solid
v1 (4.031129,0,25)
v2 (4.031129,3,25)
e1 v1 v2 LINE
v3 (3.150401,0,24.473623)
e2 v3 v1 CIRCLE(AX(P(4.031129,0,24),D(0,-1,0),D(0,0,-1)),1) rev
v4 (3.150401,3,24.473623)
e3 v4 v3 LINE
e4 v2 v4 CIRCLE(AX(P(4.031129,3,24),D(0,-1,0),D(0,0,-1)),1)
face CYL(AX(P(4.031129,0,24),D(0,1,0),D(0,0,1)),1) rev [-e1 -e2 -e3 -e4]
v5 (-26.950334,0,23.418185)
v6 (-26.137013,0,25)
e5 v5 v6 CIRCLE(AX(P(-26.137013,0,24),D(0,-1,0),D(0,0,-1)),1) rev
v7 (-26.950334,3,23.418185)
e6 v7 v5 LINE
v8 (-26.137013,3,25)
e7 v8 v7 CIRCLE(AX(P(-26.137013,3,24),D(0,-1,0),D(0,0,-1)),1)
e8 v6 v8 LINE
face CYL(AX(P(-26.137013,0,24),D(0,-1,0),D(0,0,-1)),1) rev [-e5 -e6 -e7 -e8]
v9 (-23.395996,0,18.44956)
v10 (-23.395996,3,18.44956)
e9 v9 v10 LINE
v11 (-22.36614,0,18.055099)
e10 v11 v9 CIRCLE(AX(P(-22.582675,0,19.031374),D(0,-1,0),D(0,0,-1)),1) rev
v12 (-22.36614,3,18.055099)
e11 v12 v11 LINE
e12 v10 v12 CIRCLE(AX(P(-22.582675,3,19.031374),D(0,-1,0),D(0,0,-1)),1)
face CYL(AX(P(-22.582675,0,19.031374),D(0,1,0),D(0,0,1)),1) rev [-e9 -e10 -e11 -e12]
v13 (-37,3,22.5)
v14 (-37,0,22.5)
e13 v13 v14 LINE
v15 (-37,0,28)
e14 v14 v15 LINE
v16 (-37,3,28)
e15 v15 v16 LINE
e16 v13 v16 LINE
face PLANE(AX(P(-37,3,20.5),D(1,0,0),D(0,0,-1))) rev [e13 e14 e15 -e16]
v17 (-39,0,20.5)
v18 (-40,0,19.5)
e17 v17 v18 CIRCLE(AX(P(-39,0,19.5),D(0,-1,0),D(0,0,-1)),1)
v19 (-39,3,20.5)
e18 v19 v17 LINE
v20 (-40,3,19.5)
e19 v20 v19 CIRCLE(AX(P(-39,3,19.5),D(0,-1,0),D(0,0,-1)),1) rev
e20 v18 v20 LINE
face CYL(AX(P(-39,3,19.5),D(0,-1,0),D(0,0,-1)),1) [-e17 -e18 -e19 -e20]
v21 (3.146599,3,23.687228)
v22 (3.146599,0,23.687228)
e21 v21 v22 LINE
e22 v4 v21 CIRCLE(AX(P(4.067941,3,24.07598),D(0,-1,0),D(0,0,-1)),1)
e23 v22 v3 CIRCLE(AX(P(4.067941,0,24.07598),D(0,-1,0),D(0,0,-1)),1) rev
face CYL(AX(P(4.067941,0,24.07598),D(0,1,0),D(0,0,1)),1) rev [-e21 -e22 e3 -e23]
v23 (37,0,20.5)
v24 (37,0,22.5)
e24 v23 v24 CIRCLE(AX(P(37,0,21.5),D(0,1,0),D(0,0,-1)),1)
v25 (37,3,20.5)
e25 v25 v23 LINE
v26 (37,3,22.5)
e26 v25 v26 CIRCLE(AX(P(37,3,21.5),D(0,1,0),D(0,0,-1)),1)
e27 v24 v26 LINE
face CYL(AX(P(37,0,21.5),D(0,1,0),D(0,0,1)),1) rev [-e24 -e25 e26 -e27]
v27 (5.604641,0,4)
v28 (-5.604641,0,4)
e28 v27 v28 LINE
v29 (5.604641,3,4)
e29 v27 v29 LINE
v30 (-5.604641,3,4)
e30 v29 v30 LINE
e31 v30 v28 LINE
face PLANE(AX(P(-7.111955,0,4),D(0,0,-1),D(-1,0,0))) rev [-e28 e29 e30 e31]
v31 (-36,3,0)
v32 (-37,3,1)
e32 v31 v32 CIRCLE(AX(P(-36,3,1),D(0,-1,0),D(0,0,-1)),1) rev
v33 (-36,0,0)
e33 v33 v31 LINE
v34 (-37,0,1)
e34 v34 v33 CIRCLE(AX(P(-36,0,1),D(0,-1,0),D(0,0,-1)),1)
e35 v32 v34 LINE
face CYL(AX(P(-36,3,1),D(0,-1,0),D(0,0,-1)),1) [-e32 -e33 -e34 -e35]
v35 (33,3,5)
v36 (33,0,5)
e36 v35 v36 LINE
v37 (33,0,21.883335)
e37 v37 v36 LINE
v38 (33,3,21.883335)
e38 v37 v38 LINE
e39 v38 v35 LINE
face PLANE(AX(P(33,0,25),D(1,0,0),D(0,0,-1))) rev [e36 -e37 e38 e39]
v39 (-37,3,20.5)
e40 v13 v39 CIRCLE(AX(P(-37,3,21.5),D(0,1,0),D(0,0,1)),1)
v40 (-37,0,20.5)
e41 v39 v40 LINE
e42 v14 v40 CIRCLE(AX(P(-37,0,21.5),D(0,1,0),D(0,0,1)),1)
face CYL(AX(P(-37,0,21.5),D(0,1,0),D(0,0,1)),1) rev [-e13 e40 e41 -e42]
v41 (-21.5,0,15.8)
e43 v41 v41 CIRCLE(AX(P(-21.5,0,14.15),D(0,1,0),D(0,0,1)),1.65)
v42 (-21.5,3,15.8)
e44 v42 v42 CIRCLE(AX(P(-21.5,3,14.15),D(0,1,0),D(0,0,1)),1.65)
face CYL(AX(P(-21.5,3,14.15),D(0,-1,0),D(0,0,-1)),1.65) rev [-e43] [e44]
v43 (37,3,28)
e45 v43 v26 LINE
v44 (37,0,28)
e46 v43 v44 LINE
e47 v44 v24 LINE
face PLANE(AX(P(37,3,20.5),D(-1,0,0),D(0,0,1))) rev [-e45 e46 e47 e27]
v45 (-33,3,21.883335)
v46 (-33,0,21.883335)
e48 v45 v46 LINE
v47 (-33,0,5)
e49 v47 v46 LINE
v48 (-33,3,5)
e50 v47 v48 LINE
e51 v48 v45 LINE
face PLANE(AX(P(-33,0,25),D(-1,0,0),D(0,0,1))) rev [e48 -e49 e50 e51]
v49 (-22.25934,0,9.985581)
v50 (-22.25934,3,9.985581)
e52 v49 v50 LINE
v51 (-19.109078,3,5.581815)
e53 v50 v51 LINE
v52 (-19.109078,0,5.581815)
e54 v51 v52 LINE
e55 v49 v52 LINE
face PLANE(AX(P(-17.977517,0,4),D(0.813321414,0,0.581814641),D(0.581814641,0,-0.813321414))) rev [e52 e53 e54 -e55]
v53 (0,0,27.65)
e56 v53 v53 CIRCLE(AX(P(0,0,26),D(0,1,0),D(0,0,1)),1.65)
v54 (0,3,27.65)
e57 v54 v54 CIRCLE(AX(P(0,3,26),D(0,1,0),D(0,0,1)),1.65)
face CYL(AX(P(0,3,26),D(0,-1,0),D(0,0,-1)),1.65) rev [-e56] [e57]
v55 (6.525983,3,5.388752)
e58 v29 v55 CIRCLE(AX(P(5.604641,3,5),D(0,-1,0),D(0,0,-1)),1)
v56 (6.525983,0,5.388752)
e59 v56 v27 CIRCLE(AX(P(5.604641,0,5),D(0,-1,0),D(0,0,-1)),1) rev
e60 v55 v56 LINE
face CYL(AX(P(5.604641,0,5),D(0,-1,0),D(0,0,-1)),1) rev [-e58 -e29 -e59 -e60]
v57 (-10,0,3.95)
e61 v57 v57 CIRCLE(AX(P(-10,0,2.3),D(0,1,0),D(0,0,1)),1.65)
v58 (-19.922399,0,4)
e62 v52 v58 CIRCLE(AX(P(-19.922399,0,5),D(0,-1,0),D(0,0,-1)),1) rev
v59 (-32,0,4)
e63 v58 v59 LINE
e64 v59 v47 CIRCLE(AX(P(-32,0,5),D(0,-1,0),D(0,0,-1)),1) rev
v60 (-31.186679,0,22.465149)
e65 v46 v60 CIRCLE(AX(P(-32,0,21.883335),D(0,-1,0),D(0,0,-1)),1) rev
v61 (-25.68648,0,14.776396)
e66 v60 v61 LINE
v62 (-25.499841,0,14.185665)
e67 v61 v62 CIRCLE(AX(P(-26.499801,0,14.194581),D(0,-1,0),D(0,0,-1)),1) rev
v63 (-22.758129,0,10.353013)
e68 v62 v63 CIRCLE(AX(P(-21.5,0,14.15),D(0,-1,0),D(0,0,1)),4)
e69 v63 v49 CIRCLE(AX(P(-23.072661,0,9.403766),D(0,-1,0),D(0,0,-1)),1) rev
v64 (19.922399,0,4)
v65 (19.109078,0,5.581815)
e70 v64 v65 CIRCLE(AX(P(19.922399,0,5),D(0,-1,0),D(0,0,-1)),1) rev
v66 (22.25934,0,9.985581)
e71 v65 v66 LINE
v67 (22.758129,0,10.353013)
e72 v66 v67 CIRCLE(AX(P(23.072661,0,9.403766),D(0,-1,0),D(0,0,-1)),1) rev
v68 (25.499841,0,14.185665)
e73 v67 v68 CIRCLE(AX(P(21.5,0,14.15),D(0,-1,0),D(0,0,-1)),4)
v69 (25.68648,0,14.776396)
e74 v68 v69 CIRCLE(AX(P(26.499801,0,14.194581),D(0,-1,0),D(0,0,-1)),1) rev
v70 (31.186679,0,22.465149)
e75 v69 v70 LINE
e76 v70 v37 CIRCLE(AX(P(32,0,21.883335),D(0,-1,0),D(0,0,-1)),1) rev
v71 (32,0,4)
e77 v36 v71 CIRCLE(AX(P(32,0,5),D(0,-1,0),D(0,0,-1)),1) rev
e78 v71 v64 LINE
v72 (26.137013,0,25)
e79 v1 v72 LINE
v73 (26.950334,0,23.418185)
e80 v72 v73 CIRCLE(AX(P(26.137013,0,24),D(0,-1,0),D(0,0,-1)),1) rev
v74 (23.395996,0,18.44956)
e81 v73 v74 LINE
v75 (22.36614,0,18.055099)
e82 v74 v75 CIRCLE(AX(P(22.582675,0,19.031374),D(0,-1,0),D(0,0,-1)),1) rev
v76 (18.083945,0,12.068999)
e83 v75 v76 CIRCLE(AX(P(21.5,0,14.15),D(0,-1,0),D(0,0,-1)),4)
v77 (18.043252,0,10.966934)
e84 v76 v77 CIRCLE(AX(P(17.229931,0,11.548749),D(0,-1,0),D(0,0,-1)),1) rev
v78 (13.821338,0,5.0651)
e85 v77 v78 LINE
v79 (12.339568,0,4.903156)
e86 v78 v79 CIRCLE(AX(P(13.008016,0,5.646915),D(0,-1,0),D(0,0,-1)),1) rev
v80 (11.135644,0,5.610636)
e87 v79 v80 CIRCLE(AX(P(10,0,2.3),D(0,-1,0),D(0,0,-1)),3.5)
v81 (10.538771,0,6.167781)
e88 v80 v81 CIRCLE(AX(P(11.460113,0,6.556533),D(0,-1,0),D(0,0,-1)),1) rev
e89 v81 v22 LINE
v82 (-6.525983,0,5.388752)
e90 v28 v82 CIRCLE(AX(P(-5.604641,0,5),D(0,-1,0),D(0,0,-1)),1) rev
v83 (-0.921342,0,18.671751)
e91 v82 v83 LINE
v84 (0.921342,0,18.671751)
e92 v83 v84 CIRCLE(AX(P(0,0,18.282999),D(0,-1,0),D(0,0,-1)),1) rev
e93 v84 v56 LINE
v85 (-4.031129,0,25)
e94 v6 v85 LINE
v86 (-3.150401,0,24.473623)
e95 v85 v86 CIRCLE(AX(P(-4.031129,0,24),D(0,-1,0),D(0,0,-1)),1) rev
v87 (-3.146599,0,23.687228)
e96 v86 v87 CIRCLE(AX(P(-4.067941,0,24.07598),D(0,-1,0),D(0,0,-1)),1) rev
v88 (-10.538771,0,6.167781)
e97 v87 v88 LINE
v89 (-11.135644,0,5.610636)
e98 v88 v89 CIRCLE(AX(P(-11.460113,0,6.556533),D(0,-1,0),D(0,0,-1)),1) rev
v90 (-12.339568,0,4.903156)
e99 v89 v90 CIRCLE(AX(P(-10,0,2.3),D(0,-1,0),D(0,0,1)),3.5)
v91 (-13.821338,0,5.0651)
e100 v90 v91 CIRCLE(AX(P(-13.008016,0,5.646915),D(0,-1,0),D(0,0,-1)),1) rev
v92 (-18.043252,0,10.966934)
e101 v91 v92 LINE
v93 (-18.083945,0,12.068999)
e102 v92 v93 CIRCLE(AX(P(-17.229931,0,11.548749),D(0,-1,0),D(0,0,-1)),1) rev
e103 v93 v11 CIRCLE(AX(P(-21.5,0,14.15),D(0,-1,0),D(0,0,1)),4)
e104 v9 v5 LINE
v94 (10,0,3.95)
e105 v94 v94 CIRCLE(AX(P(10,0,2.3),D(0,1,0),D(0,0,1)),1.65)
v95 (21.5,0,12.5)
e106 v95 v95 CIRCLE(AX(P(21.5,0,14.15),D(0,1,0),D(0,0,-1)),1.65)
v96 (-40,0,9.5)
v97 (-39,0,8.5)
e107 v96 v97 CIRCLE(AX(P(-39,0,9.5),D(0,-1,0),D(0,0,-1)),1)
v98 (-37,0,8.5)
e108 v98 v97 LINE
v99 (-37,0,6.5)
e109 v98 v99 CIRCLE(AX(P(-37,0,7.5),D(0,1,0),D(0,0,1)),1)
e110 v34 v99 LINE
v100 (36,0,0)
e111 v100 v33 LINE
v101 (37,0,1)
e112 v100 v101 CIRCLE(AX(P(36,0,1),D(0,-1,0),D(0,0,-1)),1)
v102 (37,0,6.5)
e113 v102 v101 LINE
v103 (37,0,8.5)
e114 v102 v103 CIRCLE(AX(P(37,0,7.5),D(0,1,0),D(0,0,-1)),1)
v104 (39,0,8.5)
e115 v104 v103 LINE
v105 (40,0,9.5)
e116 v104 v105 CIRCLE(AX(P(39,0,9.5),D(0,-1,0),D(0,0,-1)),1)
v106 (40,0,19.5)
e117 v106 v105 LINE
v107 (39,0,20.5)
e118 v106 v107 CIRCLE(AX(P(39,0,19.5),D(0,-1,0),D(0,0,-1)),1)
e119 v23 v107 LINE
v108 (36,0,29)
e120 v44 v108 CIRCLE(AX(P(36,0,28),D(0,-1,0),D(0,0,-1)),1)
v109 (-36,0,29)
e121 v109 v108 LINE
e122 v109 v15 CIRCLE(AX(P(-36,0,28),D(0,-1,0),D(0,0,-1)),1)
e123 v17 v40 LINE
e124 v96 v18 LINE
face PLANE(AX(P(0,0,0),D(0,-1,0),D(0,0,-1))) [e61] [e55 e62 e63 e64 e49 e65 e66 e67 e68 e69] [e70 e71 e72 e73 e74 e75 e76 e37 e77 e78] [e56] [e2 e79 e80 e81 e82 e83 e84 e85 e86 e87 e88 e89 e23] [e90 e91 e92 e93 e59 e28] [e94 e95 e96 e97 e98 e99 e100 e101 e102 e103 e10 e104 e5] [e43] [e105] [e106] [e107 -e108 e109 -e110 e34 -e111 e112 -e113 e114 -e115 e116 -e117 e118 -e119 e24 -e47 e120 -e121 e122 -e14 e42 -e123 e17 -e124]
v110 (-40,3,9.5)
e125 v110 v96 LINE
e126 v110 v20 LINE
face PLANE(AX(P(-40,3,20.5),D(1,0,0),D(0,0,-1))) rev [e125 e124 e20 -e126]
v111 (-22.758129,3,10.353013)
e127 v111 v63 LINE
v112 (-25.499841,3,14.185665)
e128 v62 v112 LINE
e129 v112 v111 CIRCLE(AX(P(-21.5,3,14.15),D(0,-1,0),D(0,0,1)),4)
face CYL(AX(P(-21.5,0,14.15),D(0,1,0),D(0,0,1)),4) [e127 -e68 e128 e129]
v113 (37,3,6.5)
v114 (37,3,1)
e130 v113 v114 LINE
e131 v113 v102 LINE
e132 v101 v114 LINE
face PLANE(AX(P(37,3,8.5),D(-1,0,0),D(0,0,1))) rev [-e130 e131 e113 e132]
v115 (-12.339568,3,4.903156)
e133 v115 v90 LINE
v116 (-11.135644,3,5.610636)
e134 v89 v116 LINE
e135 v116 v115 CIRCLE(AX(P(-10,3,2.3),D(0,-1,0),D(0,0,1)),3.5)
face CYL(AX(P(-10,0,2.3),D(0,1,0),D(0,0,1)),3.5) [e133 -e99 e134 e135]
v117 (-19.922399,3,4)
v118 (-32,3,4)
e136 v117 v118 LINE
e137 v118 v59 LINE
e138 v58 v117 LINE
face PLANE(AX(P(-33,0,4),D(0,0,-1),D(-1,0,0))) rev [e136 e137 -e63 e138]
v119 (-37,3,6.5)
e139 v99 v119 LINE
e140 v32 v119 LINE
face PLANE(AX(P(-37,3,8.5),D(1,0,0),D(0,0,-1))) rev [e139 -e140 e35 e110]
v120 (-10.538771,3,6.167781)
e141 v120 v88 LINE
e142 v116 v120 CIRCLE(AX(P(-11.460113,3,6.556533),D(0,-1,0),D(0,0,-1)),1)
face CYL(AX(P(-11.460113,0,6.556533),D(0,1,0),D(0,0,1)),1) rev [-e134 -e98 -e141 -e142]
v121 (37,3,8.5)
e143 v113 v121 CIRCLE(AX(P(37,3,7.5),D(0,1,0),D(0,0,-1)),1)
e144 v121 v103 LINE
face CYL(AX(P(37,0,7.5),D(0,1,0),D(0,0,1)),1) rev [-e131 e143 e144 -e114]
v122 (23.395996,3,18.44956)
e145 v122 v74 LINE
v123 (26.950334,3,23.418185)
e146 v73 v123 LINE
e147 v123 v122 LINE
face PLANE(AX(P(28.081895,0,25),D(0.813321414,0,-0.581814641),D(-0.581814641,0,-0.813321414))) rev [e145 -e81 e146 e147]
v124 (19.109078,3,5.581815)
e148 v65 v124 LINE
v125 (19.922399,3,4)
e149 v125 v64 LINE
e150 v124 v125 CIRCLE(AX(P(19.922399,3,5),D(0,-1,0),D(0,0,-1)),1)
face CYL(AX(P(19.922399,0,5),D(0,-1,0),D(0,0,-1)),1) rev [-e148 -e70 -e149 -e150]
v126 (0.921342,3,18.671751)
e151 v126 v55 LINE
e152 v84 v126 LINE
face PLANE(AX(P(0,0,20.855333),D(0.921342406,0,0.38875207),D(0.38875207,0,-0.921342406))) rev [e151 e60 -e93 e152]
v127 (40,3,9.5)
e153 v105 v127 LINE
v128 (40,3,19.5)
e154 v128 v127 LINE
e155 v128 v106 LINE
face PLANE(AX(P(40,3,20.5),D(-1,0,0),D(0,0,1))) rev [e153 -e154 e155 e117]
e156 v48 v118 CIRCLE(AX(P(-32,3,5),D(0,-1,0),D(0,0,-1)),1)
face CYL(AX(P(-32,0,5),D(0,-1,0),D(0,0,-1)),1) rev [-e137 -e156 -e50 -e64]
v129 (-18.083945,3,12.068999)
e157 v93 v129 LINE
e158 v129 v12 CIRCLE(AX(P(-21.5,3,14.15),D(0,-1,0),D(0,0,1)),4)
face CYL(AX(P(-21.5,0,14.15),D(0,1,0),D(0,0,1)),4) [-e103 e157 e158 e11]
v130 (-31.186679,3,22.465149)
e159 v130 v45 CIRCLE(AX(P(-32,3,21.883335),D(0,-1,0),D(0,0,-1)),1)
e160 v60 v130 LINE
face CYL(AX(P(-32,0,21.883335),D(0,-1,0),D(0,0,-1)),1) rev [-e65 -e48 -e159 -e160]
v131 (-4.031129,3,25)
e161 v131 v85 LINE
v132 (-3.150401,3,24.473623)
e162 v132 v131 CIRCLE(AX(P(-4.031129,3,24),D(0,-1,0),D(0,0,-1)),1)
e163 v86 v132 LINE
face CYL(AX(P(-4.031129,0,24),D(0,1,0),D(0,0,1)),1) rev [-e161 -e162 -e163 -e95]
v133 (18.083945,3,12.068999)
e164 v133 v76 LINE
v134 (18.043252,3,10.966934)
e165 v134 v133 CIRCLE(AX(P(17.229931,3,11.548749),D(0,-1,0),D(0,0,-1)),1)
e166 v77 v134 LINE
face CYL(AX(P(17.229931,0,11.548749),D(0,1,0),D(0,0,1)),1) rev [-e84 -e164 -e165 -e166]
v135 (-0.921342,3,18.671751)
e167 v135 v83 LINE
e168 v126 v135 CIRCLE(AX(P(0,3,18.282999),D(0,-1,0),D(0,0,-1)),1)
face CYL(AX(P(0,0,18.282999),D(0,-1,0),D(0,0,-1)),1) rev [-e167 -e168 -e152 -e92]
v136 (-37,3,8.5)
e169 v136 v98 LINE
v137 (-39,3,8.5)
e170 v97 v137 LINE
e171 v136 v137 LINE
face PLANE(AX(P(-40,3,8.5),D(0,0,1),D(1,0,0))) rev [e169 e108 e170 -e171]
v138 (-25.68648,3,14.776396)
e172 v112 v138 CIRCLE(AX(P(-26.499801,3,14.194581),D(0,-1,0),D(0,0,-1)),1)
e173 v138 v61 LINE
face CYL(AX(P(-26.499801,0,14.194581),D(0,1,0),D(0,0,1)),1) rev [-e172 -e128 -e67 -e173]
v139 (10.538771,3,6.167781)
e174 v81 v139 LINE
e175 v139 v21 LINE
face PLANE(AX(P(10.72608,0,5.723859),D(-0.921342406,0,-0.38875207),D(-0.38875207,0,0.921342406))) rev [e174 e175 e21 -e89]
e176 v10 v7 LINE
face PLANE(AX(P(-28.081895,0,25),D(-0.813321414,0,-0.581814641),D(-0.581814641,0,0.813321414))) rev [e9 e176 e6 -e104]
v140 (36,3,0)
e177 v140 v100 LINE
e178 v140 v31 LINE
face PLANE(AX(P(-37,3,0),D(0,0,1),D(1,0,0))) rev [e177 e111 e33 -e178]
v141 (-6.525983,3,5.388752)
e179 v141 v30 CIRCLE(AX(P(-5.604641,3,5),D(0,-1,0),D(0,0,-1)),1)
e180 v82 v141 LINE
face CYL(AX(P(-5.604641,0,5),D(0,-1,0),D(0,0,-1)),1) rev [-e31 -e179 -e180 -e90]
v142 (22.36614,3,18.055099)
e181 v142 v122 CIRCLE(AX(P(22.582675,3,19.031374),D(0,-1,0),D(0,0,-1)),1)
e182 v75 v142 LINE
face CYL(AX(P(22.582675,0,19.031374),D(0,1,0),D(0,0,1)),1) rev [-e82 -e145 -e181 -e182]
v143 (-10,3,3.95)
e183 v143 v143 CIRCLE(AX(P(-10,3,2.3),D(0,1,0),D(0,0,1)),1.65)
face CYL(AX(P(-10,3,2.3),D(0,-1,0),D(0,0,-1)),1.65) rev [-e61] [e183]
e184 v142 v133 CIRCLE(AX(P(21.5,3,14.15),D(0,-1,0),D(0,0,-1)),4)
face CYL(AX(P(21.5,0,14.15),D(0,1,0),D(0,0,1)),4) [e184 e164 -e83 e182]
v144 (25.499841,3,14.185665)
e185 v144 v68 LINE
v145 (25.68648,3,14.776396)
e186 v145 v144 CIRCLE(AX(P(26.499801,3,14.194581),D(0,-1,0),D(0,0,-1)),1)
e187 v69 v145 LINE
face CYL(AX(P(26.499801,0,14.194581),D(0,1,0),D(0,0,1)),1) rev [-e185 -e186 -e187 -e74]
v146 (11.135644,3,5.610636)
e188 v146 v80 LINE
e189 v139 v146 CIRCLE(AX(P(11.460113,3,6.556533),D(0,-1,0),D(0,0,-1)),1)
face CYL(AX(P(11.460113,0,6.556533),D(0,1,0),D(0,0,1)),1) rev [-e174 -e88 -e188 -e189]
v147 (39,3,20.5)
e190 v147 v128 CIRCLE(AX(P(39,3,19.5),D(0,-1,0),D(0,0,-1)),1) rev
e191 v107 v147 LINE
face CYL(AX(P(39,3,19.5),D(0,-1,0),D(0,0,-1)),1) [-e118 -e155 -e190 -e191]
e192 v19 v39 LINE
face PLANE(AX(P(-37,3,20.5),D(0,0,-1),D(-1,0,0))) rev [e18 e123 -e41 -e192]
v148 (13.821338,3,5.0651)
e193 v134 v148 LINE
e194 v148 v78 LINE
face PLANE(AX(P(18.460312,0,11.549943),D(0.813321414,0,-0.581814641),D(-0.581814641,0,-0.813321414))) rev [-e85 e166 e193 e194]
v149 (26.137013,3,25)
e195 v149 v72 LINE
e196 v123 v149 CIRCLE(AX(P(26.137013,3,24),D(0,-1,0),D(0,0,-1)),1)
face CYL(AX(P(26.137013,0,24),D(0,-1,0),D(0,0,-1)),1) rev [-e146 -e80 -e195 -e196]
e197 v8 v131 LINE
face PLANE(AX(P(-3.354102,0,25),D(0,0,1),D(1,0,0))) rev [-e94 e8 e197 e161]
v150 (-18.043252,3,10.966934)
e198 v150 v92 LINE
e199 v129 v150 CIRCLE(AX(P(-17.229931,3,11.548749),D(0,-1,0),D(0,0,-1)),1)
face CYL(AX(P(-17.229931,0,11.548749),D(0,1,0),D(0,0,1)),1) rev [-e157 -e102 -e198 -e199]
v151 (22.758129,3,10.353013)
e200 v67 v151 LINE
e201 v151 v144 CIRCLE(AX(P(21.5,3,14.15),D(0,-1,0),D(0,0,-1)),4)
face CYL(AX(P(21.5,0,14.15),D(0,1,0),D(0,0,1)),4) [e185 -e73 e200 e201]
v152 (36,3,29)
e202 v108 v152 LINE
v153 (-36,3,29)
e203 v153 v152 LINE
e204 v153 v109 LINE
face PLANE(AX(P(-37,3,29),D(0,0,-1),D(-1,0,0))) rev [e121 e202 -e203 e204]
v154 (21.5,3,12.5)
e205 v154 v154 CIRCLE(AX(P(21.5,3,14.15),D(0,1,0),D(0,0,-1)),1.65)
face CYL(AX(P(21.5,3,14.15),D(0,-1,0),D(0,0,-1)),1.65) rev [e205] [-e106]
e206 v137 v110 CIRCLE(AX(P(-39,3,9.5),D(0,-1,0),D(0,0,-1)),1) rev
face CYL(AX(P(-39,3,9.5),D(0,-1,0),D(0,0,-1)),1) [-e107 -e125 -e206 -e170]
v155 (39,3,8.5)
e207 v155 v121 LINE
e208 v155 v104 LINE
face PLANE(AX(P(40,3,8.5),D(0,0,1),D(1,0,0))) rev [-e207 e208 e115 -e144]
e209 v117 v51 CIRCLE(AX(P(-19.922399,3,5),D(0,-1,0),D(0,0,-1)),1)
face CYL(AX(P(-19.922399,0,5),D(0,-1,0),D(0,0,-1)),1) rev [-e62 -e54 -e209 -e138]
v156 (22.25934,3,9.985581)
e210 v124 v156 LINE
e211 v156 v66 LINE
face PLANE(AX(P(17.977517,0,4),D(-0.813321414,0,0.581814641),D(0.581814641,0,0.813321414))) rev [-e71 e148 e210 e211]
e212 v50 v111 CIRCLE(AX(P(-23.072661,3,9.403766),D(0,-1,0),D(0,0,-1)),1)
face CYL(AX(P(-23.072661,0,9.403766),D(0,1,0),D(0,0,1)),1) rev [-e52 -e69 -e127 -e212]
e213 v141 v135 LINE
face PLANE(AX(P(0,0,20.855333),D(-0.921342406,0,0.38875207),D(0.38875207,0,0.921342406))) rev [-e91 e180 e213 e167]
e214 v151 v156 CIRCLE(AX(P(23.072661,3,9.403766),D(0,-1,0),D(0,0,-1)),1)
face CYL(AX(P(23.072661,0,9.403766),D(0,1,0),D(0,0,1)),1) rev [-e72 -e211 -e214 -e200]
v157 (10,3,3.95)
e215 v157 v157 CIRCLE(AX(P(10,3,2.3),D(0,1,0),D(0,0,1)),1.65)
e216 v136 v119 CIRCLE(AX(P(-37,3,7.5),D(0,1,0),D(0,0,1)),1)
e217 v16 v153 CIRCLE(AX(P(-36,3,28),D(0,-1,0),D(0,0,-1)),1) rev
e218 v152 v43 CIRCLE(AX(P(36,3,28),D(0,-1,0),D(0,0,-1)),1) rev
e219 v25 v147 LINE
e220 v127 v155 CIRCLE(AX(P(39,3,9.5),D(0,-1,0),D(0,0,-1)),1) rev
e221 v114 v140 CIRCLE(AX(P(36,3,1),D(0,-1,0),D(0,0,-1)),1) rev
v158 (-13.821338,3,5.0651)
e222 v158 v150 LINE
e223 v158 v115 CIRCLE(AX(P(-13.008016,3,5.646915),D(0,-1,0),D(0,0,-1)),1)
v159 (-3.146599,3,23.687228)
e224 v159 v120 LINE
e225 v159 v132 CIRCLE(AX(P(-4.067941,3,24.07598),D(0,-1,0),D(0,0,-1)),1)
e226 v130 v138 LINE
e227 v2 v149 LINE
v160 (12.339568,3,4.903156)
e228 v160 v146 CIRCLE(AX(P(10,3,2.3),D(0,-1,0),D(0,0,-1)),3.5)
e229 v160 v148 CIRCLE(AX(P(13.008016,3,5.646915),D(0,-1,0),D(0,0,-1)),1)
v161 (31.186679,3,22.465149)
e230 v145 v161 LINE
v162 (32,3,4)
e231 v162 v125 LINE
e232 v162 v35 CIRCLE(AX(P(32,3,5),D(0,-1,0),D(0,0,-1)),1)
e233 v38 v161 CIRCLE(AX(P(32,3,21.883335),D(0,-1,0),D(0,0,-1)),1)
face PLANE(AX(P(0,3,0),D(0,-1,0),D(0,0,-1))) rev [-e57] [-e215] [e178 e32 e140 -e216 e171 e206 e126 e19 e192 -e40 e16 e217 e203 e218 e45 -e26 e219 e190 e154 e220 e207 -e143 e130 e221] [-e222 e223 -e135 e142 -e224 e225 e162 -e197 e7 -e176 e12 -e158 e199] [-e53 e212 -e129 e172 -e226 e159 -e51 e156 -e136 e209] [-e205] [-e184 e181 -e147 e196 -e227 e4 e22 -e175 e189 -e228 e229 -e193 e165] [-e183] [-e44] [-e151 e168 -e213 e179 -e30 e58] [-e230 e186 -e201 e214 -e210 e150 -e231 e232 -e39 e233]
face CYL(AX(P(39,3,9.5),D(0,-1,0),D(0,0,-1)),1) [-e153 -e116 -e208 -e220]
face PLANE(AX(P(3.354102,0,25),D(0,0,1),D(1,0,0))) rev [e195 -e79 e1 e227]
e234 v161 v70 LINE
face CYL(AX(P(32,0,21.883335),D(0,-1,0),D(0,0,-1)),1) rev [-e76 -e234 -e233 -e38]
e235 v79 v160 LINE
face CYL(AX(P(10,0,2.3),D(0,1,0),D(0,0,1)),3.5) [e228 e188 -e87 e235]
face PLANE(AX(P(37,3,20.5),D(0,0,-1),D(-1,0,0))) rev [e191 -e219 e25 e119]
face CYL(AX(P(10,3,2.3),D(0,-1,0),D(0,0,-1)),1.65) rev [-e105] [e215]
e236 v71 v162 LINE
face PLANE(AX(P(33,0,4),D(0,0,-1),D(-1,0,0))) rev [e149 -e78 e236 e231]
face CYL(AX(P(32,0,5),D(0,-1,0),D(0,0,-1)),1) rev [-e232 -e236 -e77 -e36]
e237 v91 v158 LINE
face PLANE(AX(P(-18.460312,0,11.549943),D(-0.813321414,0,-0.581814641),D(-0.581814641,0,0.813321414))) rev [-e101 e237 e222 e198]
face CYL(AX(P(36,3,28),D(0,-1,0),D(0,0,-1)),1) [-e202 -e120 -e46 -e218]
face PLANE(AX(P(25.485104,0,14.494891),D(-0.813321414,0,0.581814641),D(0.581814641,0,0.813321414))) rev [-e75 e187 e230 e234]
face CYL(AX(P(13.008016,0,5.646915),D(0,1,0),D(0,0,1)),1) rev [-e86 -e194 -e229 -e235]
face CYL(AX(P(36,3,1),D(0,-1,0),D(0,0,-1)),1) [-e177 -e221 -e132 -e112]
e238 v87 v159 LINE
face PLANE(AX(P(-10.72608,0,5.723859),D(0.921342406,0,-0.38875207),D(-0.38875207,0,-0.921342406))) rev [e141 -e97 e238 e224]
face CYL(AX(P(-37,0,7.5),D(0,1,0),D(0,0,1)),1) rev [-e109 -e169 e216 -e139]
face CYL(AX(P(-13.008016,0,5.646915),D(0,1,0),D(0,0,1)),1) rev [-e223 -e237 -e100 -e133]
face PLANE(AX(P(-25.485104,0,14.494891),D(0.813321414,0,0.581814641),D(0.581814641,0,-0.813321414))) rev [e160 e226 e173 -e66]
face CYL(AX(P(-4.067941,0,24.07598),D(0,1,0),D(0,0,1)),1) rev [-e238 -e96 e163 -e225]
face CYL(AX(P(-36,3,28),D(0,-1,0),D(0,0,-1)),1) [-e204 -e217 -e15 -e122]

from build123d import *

# Parameters (mm, degrees)
SKETCH_3_R          = 1.65
EXTRUDE_6_DEPTH     = 3
SKETCH_4_R          = 1
CUT_EXTRUDE_1_DEPTH = 50.497474683
FILLET_1_R          = 1


with BuildPart() as part:
    # 草图3 → 凸台-拉伸6 (new body)
    with BuildSketch(Plane(origin=(0, 0, 0), x_dir=(1, 0, 0), z_dir=(0, 1, 0))):
        Polygon((-37, -20.5), (-40, -20.5), (-40, -8.5), (-37, -8.5), (-37, 0), (37, 0), (37, -8.5), (40, -8.5), (40, -20.5), (37, -20.5), (37, -29), (-37, -29), align=None)
        with Locations(Location((-10, -2.3, 0), (0, 0, 270))):
            Circle(SKETCH_3_R, mode=Mode.SUBTRACT)
        with Locations(Location((10, -2.3, 0), (0, 0, 270))):
            Circle(SKETCH_3_R, mode=Mode.SUBTRACT)
        with Locations(Location((0, -26, 0), (0, 0, 270))):
            Circle(SKETCH_3_R, mode=Mode.SUBTRACT)
        with Locations(Location((-21.5, -14.15, 0), (0, 0, 270))):
            Circle(SKETCH_3_R, mode=Mode.SUBTRACT)
        with Locations(Location((21.5, -14.15, 0), (0, 0, 90))):
            Circle(SKETCH_3_R, mode=Mode.SUBTRACT)
    extrude(amount=EXTRUDE_6_DEPTH)

    # 草图4 → 切除-拉伸1 (cut, through all)
    with BuildSketch(Plane(origin=(0, 3, 0), x_dir=(1, 0, 0), z_dir=(0, 1, 0))):
        with Locations((-37, -7.5)):
            Circle(SKETCH_4_R)
        with Locations((-37, -21.5)):
            Circle(SKETCH_4_R)
        with Locations((37, -21.5)):
            Circle(SKETCH_4_R)
        with Locations((37, -7.5)):
            Circle(SKETCH_4_R)
        with BuildLine():
            Line((-33, -4), (-17.977516568, -4))
            Line((-17.977516568, -4), (-22.460716028, -10.267085539))
            ThreePointArc((-22.460716028, -10.267085539), (-24.753285657, -11.822741434), (-25.485103536, -14.494891011))
            Line((-25.485103536, -14.494891011), (-33, -25))
            Line((-33, -25), (-33, -4))
        make_face()
        with BuildLine():
            Line((-28.08189514, -25), (-22.978936608, -17.866550351))
            ThreePointArc((-22.978936608, -17.866550351), (-18.246714343, -16.477258566), (-18.460311642, -11.549943331))
            Line((-18.460311642, -11.549943331), (-13.059411708, -4))
            ThreePointArc((-13.059411708, -4), (-12.079761561, -5.115065159), (-10.726079501, -5.723858723))
            Line((-10.726079501, -5.723858723), (-2.959290121, -24.131149556))
            ThreePointArc((-2.959290121, -24.131149556), (-3.186448679, -24.552054968), (-3.354101966, -25))
            Line((-3.354101966, -25), (-28.08189514, -25))
        make_face()
        Polygon((-7.111954792, -4), (7.111954792, -4), (0, -20.855332858), align=None)
        with BuildLine():
            Line((33, -25), (33, -4))
            Line((33, -4), (17.977516568, -4))
            Line((17.977516568, -4), (22.460716028, -10.267085539))
            ThreePointArc((22.460716028, -10.267085539), (24.753285657, -11.822741434), (25.485103536, -14.494891011))
            Line((25.485103536, -14.494891011), (33, -25))
        make_face()
        with BuildLine():
            Line((3.354101966, -25), (28.08189514, -25))
            Line((28.08189514, -25), (22.978936608, -17.866550351))
            ThreePointArc((22.978936608, -17.866550351), (18.246714343, -16.477258566), (18.460311642, -11.549943331))
            Line((18.460311642, -11.549943331), (13.059411708, -4))
            ThreePointArc((13.059411708, -4), (12.079761561, -5.115065159), (10.726079501, -5.723858723))
            Line((10.726079501, -5.723858723), (2.959290121, -24.131149556))
            ThreePointArc((2.959290121, -24.131149556), (3.186448679, -24.552054968), (3.354101966, -25))
        make_face()
    extrude(amount=-CUT_EXTRUDE_1_DEPTH, mode=Mode.SUBTRACT)

    # 圆角1
    # the kernel refuses this fillet: 1 mm, written as the material it adds along each edge
    with BuildSketch(Plane(origin=(17.977516568, 3, 4), x_dir=(1, 0, 0), z_dir=(0, -1, 0)), Plane(origin=(-28.08189514, 3, 25), x_dir=(0.5818146414920115, 0, -0.8133214142917436), z_dir=(0, -1, 0)), Plane(origin=(-17.977516568, 3, 4), x_dir=(-0.5818146414920105, 0, 0.8133214142917444), z_dir=(0, -1, 0))) as fillet_1_piece_1:
        with BuildLine():
            CenterArc((FILLET_1_R * 1.94488256881, FILLET_1_R), FILLET_1_R, 144.421723672, 125.578276328)
            Line((FILLET_1_R * 1.13156115451, FILLET_1_R * 1.58181464149), (0, 0))
            Line((0, 0), (FILLET_1_R * 1.94488256881, 0))
        make_face()
    extrude(amount=3)
    with BuildSketch(Plane(origin=(33, 3, 4), x_dir=(-1, 0, 0), z_dir=(0, -1, 0)), Plane(origin=(-33, 3, 4), x_dir=(0, 0, 1), z_dir=(0, -1, 0))) as fillet_1_piece_2:
        with BuildLine():
            CenterArc((FILLET_1_R, -FILLET_1_R), FILLET_1_R, 90, 90)
            Line((0, -FILLET_1_R), (0, 0))
            Line((0, 0), (FILLET_1_R, 0))
        make_face()
    extrude(amount=3)
    with BuildSketch(Plane(origin=(2.959290121, 3, 24.131149556), x_dir=(0.38875206983693955, 0, -0.9213424055135502), z_dir=(0, -1, 0))) as fillet_1_piece_3:
        with BuildLine():
            CenterArc((0.481820643, 1), FILLET_1_R, 221.810314896, 48.189685104)
            ThreePointArc((-0.26353535, 0.333333333), (-0.126704365, 0.17066975), (0, 0))
            Line((0, 0), (0.481820643, 0))
        make_face()
    extrude(amount=3)
    with BuildSketch(Plane(origin=(10.726079501, 3, 5.723858723), x_dir=(-0.38875206983694, 0, 0.92134240551355), z_dir=(0, -1, 0)), Plane(origin=(-2.959290121, 3, 24.131149556), x_dir=(-0.38875206983693955, 0, -0.9213424055135502), z_dir=(0, -1, 0))) as fillet_1_piece_4:
        with BuildLine():
            CenterArc((0.481820643, -1), FILLET_1_R, 90, 48.189685104)
            ThreePointArc((-0.26353535, -0.333333333), (-0.126704365, -0.17066975), (0, 0))
            Line((0, 0), (0.481820643, 0))
        make_face()
    extrude(amount=3)
    with BuildSketch(Plane(origin=(13.059411708, 3, 4), x_dir=(-0.6232784406716191, 0, 0.7819999906610966), z_dir=(0, -1, 0))) as fillet_1_piece_5:
        with BuildLine():
            CenterArc((1.319920856, -0.986295222), FILLET_1_R, 99.496659768, 96.369123068)
            Line((0.358016109, -1.259680038), (0, 0))
            ThreePointArc((0, 0), (0.577465375, -0.047966724), (1.154930749, 0))
        make_face()
    extrude(amount=3)
    with BuildSketch(Plane(origin=(18.460311642, 3, 11.549943331), x_dir=(-0.5818146414920088, 0, -0.8133214142917455), z_dir=(0, -1, 0)), Plane(origin=(-22.978936608, 3, 17.866550351), x_dir=(-0.581814641492012, 0, 0.8133214142917432), z_dir=(0, -1, 0))) as fillet_1_piece_6:
        with BuildLine():
            CenterArc((0.716825297, -1), FILLET_1_R, 90, 66.927317505)
            ThreePointArc((-0.203183154, -0.608101481), (-0.089388104, -0.308128251), (0, 0))
            Line((0, 0), (0.716825297, 0))
        make_face()
    extrude(amount=3)
    with BuildSketch(Plane(origin=(22.978936608, 3, 17.866550351), x_dir=(-0.9557806548183481, 0, 0.29408049897096183), z_dir=(0, -1, 0)), Plane(origin=(-18.460311642, 3, 11.549943331), x_dir=(0.5870204705662555, 0, 0.8095720889063382), z_dir=(0, -1, 0))) as fillet_1_piece_7:
        with BuildLine():
            CenterArc((0.721291541, -0.996783336), FILLET_1_R, 94.59681443, 66.927317505)
            Line((-0.227165673, -0.679878124), (0, 0))
            ThreePointArc((0, 0), (0.320574018, -0.012866657), (0.641148037, 0))
        make_face()
    extrude(amount=3)
    with BuildSketch(Plane(origin=(28.08189514, 3, 25), x_dir=(-0.5818146414920125, 0, -0.813321414291743), z_dir=(0, -1, 0))) as fillet_1_piece_8:
        with BuildLine():
            CenterArc((FILLET_1_R * 1.94488256881, -FILLET_1_R), FILLET_1_R, 90, 125.578276328)
            Line((FILLET_1_R * 1.13156115451, -FILLET_1_R * 1.58181464149), (0, 0))
            Line((0, 0), (FILLET_1_R * 1.94488256881, 0))
        make_face()
    extrude(amount=3)
    with BuildSketch(Plane(origin=(3.354101966, 3, 25), x_dir=(1, 0, 0), z_dir=(0, -1, 0))) as fillet_1_piece_9:
        with BuildLine():
            CenterArc((0.677026908, -1), FILLET_1_R, 90, 63.612200039)
            ThreePointArc((-0.218779509, -0.555555556), (-0.09752127, -0.282451624), (0, 0))
            Line((0, 0), (0.677026908, 0))
        make_face()
    extrude(amount=3)
    with BuildSketch(Plane(origin=(-13.059411708, 3, 4), x_dir=(-0.5818146414920109, 0, 0.8133214142917442), z_dir=(0, -1, 0))) as fillet_1_piece_10:
        with BuildLine():
            CenterArc((1.309568376, -1), FILLET_1_R, 90, 96.369123068)
            ThreePointArc((0.31574053, -1.11093337), (0.204009684, -0.542353311), (0, 0))
            Line((0, 0), (1.309568376, 0))
        make_face()
    extrude(amount=3)
    with BuildSketch(Plane(origin=(-10.726079501, 3, 5.723858723), x_dir=(-0.9638482393906854, 0, -0.26645181820260827), z_dir=(0, -1, 0))) as fillet_1_piece_11:
        with BuildLine():
            CenterArc((0.485629561, -0.99815583), FILLET_1_R, 93.480205158, 48.189685104)
            Line((-0.298820999, -0.377964473), (0, 0))
            ThreePointArc((0, 0), (0.212462933, -0.006454594), (0.424925866, 0))
        make_face()
    extrude(amount=3)
    with BuildSketch(Plane(origin=(-3.354101966, 3, 25), x_dir=(0.3664147496948947, 0, -0.9304516275476269), z_dir=(0, -1, 0))) as fillet_1_piece_12:
        with BuildLine():
            CenterArc((0.682378983, -0.996355538), FILLET_1_R, 94.893125181, 63.612200039)
            Line((-0.248072645, -0.629940788), (0, 0))
            ThreePointArc((0, 0), (0.298540805, -0.012755617), (0.59708161, 0))
        make_face()
    extrude(amount=3)
    with BuildSketch(Plane(origin=(-7.111954792, 3, 4), x_dir=(0.38875206983694144, 0, 0.9213424055135496), z_dir=(0, -1, 0))) as fillet_1_piece_13:
        with BuildLine():
            CenterArc((FILLET_1_R * 1.507313743, -FILLET_1_R), FILLET_1_R, 90, 112.876871805)
            Line((FILLET_1_R * 0.585971337484, -FILLET_1_R * 1.38875206984), (0, 0))
            Line((0, 0), (FILLET_1_R * 1.507313743, 0))
        make_face()
    extrude(amount=3)
    with BuildSketch(Plane(origin=(7.111954792, 3, 4), x_dir=(-0.38875206983694094, 0, 0.9213424055135497), z_dir=(0, -1, 0))) as fillet_1_piece_14:
        with BuildLine():
            CenterArc((FILLET_1_R * 1.507313743, FILLET_1_R), FILLET_1_R, 157.123128195, 112.876871805)
            Line((FILLET_1_R * 0.585971337484, FILLET_1_R * 1.38875206984), (0, 0))
            Line((0, 0), (FILLET_1_R * 1.507313743, 0))
        make_face()
    extrude(amount=3)
    with BuildSketch(Plane(origin=(0, 3, 20.855332858), x_dir=(0.38875206983694144, 0, -0.9213424055135495), z_dir=(0, -1, 0))) as fillet_1_piece_15:
        with BuildLine():
            CenterArc((FILLET_1_R * 2.37, -FILLET_1_R), FILLET_1_R, 90, 134.246256391)
            Line((FILLET_1_R * 1.65365246566, -FILLET_1_R * 1.69774365639), (0, 0))
            Line((0, 0), (FILLET_1_R * 2.37, 0))
        make_face()
    extrude(amount=3)
    with BuildSketch(Plane(origin=(33, 3, 25), x_dir=(0, 0, -1), z_dir=(0, -1, 0)), Plane(origin=(-33, 3, 25), x_dir=(0.5818146414920113, 0, -0.8133214142917439), z_dir=(0, -1, 0))) as fillet_1_piece_16:
        with BuildLine():
            CenterArc((FILLET_1_R * 3.11666514552, -FILLET_1_R), FILLET_1_R, 90, 144.421723672)
            Line((FILLET_1_R * 2.53485050403, -FILLET_1_R * 1.81332141429), (0, 0))
            Line((0, 0), (FILLET_1_R * 3.11666514552, 0))
        make_face()
    extrude(amount=3)
    with BuildSketch(Plane(origin=(25.485103536, 3, 14.494891011), x_dir=(0.5818146414920119, 0, 0.8133214142917433), z_dir=(0, -1, 0)), Plane(origin=(-22.460716028, 3, 10.267085539), x_dir=(0.5818146414920021, 0, -0.8133214142917503), z_dir=(0, -1, 0))) as fillet_1_piece_17:
        with BuildLine():
            CenterArc((0.346117617, -1), FILLET_1_R, 90, 36.089146464)
            ThreePointArc((-0.242925672, -0.191898519), (-0.11960566, -0.098300271), (0, 0))
            Line((0, 0), (0.346117617, 0))
        make_face()
    extrude(amount=3)
    with BuildSketch(Plane(origin=(22.460716028, 3, 10.267085539), x_dir=(0.9607072883816618, 0, 0.277563517145814), z_dir=(0, -1, 0)), Plane(origin=(-25.485103536, 3, 14.494891011), x_dir=(-0.04760515714824153, 0, -0.99886623179127), z_dir=(0, -1, 0))) as fillet_1_piece_18:
        with BuildLine():
            CenterArc((0.348274134, -0.999250986), FILLET_1_R, 92.217735732, 36.089146464)
            Line((-0.271599158, -0.214549067), (0, 0))
            ThreePointArc((0, 0), (0.154788504, -0.002996057), (0.309577008, 0))
        make_face()
    extrude(amount=3)
    # the kernel refuses this fillet: 1 mm, written as the material it takes off along each edge
    with BuildSketch(Plane(origin=(-37, -2.5, 0), x_dir=(0, 0, 1), z_dir=(0, 1, 0)), Plane(origin=(37, -2.5, 0), x_dir=(-1, 0, 0), z_dir=(0, 1, 0)), Plane(origin=(40, -2.5, 8.5), x_dir=(-1, 0, 0), z_dir=(0, 1, 0)), Plane(origin=(40, -2.5, 20.5), x_dir=(0, 0, -1), z_dir=(0, 1, 0)), Plane(origin=(37, -2.5, 29), x_dir=(0, 0, -1), z_dir=(0, 1, 0)), Plane(origin=(-40, -2.5, 20.5), x_dir=(1, 0, 0), z_dir=(0, 1, 0)), Plane(origin=(-40, -2.5, 8.5), x_dir=(0, 0, 1), z_dir=(0, 1, 0))) as fillet_1_2_piece_1:
        with BuildLine():
            CenterArc((FILLET_1_R, FILLET_1_R), FILLET_1_R, 180, 90)
            Line((0, FILLET_1_R), (0, 0))
            Line((0, 0), (FILLET_1_R, 0))
        make_face()
    extrude(amount=8, mode=Mode.SUBTRACT)
    with BuildSketch(Plane(origin=(-37, -2.5, 29), x_dir=(0, 0, -1), z_dir=(0, 1, 0))) as fillet_1_2_piece_2:
        with BuildLine():
            CenterArc((FILLET_1_R, -FILLET_1_R), FILLET_1_R, 90, 90)
            Line((0, -FILLET_1_R), (0, 0))
            Line((0, 0), (FILLET_1_R, 0))
        make_face()
    extrude(amount=8, mode=Mode.SUBTRACT)


solid = part.part
